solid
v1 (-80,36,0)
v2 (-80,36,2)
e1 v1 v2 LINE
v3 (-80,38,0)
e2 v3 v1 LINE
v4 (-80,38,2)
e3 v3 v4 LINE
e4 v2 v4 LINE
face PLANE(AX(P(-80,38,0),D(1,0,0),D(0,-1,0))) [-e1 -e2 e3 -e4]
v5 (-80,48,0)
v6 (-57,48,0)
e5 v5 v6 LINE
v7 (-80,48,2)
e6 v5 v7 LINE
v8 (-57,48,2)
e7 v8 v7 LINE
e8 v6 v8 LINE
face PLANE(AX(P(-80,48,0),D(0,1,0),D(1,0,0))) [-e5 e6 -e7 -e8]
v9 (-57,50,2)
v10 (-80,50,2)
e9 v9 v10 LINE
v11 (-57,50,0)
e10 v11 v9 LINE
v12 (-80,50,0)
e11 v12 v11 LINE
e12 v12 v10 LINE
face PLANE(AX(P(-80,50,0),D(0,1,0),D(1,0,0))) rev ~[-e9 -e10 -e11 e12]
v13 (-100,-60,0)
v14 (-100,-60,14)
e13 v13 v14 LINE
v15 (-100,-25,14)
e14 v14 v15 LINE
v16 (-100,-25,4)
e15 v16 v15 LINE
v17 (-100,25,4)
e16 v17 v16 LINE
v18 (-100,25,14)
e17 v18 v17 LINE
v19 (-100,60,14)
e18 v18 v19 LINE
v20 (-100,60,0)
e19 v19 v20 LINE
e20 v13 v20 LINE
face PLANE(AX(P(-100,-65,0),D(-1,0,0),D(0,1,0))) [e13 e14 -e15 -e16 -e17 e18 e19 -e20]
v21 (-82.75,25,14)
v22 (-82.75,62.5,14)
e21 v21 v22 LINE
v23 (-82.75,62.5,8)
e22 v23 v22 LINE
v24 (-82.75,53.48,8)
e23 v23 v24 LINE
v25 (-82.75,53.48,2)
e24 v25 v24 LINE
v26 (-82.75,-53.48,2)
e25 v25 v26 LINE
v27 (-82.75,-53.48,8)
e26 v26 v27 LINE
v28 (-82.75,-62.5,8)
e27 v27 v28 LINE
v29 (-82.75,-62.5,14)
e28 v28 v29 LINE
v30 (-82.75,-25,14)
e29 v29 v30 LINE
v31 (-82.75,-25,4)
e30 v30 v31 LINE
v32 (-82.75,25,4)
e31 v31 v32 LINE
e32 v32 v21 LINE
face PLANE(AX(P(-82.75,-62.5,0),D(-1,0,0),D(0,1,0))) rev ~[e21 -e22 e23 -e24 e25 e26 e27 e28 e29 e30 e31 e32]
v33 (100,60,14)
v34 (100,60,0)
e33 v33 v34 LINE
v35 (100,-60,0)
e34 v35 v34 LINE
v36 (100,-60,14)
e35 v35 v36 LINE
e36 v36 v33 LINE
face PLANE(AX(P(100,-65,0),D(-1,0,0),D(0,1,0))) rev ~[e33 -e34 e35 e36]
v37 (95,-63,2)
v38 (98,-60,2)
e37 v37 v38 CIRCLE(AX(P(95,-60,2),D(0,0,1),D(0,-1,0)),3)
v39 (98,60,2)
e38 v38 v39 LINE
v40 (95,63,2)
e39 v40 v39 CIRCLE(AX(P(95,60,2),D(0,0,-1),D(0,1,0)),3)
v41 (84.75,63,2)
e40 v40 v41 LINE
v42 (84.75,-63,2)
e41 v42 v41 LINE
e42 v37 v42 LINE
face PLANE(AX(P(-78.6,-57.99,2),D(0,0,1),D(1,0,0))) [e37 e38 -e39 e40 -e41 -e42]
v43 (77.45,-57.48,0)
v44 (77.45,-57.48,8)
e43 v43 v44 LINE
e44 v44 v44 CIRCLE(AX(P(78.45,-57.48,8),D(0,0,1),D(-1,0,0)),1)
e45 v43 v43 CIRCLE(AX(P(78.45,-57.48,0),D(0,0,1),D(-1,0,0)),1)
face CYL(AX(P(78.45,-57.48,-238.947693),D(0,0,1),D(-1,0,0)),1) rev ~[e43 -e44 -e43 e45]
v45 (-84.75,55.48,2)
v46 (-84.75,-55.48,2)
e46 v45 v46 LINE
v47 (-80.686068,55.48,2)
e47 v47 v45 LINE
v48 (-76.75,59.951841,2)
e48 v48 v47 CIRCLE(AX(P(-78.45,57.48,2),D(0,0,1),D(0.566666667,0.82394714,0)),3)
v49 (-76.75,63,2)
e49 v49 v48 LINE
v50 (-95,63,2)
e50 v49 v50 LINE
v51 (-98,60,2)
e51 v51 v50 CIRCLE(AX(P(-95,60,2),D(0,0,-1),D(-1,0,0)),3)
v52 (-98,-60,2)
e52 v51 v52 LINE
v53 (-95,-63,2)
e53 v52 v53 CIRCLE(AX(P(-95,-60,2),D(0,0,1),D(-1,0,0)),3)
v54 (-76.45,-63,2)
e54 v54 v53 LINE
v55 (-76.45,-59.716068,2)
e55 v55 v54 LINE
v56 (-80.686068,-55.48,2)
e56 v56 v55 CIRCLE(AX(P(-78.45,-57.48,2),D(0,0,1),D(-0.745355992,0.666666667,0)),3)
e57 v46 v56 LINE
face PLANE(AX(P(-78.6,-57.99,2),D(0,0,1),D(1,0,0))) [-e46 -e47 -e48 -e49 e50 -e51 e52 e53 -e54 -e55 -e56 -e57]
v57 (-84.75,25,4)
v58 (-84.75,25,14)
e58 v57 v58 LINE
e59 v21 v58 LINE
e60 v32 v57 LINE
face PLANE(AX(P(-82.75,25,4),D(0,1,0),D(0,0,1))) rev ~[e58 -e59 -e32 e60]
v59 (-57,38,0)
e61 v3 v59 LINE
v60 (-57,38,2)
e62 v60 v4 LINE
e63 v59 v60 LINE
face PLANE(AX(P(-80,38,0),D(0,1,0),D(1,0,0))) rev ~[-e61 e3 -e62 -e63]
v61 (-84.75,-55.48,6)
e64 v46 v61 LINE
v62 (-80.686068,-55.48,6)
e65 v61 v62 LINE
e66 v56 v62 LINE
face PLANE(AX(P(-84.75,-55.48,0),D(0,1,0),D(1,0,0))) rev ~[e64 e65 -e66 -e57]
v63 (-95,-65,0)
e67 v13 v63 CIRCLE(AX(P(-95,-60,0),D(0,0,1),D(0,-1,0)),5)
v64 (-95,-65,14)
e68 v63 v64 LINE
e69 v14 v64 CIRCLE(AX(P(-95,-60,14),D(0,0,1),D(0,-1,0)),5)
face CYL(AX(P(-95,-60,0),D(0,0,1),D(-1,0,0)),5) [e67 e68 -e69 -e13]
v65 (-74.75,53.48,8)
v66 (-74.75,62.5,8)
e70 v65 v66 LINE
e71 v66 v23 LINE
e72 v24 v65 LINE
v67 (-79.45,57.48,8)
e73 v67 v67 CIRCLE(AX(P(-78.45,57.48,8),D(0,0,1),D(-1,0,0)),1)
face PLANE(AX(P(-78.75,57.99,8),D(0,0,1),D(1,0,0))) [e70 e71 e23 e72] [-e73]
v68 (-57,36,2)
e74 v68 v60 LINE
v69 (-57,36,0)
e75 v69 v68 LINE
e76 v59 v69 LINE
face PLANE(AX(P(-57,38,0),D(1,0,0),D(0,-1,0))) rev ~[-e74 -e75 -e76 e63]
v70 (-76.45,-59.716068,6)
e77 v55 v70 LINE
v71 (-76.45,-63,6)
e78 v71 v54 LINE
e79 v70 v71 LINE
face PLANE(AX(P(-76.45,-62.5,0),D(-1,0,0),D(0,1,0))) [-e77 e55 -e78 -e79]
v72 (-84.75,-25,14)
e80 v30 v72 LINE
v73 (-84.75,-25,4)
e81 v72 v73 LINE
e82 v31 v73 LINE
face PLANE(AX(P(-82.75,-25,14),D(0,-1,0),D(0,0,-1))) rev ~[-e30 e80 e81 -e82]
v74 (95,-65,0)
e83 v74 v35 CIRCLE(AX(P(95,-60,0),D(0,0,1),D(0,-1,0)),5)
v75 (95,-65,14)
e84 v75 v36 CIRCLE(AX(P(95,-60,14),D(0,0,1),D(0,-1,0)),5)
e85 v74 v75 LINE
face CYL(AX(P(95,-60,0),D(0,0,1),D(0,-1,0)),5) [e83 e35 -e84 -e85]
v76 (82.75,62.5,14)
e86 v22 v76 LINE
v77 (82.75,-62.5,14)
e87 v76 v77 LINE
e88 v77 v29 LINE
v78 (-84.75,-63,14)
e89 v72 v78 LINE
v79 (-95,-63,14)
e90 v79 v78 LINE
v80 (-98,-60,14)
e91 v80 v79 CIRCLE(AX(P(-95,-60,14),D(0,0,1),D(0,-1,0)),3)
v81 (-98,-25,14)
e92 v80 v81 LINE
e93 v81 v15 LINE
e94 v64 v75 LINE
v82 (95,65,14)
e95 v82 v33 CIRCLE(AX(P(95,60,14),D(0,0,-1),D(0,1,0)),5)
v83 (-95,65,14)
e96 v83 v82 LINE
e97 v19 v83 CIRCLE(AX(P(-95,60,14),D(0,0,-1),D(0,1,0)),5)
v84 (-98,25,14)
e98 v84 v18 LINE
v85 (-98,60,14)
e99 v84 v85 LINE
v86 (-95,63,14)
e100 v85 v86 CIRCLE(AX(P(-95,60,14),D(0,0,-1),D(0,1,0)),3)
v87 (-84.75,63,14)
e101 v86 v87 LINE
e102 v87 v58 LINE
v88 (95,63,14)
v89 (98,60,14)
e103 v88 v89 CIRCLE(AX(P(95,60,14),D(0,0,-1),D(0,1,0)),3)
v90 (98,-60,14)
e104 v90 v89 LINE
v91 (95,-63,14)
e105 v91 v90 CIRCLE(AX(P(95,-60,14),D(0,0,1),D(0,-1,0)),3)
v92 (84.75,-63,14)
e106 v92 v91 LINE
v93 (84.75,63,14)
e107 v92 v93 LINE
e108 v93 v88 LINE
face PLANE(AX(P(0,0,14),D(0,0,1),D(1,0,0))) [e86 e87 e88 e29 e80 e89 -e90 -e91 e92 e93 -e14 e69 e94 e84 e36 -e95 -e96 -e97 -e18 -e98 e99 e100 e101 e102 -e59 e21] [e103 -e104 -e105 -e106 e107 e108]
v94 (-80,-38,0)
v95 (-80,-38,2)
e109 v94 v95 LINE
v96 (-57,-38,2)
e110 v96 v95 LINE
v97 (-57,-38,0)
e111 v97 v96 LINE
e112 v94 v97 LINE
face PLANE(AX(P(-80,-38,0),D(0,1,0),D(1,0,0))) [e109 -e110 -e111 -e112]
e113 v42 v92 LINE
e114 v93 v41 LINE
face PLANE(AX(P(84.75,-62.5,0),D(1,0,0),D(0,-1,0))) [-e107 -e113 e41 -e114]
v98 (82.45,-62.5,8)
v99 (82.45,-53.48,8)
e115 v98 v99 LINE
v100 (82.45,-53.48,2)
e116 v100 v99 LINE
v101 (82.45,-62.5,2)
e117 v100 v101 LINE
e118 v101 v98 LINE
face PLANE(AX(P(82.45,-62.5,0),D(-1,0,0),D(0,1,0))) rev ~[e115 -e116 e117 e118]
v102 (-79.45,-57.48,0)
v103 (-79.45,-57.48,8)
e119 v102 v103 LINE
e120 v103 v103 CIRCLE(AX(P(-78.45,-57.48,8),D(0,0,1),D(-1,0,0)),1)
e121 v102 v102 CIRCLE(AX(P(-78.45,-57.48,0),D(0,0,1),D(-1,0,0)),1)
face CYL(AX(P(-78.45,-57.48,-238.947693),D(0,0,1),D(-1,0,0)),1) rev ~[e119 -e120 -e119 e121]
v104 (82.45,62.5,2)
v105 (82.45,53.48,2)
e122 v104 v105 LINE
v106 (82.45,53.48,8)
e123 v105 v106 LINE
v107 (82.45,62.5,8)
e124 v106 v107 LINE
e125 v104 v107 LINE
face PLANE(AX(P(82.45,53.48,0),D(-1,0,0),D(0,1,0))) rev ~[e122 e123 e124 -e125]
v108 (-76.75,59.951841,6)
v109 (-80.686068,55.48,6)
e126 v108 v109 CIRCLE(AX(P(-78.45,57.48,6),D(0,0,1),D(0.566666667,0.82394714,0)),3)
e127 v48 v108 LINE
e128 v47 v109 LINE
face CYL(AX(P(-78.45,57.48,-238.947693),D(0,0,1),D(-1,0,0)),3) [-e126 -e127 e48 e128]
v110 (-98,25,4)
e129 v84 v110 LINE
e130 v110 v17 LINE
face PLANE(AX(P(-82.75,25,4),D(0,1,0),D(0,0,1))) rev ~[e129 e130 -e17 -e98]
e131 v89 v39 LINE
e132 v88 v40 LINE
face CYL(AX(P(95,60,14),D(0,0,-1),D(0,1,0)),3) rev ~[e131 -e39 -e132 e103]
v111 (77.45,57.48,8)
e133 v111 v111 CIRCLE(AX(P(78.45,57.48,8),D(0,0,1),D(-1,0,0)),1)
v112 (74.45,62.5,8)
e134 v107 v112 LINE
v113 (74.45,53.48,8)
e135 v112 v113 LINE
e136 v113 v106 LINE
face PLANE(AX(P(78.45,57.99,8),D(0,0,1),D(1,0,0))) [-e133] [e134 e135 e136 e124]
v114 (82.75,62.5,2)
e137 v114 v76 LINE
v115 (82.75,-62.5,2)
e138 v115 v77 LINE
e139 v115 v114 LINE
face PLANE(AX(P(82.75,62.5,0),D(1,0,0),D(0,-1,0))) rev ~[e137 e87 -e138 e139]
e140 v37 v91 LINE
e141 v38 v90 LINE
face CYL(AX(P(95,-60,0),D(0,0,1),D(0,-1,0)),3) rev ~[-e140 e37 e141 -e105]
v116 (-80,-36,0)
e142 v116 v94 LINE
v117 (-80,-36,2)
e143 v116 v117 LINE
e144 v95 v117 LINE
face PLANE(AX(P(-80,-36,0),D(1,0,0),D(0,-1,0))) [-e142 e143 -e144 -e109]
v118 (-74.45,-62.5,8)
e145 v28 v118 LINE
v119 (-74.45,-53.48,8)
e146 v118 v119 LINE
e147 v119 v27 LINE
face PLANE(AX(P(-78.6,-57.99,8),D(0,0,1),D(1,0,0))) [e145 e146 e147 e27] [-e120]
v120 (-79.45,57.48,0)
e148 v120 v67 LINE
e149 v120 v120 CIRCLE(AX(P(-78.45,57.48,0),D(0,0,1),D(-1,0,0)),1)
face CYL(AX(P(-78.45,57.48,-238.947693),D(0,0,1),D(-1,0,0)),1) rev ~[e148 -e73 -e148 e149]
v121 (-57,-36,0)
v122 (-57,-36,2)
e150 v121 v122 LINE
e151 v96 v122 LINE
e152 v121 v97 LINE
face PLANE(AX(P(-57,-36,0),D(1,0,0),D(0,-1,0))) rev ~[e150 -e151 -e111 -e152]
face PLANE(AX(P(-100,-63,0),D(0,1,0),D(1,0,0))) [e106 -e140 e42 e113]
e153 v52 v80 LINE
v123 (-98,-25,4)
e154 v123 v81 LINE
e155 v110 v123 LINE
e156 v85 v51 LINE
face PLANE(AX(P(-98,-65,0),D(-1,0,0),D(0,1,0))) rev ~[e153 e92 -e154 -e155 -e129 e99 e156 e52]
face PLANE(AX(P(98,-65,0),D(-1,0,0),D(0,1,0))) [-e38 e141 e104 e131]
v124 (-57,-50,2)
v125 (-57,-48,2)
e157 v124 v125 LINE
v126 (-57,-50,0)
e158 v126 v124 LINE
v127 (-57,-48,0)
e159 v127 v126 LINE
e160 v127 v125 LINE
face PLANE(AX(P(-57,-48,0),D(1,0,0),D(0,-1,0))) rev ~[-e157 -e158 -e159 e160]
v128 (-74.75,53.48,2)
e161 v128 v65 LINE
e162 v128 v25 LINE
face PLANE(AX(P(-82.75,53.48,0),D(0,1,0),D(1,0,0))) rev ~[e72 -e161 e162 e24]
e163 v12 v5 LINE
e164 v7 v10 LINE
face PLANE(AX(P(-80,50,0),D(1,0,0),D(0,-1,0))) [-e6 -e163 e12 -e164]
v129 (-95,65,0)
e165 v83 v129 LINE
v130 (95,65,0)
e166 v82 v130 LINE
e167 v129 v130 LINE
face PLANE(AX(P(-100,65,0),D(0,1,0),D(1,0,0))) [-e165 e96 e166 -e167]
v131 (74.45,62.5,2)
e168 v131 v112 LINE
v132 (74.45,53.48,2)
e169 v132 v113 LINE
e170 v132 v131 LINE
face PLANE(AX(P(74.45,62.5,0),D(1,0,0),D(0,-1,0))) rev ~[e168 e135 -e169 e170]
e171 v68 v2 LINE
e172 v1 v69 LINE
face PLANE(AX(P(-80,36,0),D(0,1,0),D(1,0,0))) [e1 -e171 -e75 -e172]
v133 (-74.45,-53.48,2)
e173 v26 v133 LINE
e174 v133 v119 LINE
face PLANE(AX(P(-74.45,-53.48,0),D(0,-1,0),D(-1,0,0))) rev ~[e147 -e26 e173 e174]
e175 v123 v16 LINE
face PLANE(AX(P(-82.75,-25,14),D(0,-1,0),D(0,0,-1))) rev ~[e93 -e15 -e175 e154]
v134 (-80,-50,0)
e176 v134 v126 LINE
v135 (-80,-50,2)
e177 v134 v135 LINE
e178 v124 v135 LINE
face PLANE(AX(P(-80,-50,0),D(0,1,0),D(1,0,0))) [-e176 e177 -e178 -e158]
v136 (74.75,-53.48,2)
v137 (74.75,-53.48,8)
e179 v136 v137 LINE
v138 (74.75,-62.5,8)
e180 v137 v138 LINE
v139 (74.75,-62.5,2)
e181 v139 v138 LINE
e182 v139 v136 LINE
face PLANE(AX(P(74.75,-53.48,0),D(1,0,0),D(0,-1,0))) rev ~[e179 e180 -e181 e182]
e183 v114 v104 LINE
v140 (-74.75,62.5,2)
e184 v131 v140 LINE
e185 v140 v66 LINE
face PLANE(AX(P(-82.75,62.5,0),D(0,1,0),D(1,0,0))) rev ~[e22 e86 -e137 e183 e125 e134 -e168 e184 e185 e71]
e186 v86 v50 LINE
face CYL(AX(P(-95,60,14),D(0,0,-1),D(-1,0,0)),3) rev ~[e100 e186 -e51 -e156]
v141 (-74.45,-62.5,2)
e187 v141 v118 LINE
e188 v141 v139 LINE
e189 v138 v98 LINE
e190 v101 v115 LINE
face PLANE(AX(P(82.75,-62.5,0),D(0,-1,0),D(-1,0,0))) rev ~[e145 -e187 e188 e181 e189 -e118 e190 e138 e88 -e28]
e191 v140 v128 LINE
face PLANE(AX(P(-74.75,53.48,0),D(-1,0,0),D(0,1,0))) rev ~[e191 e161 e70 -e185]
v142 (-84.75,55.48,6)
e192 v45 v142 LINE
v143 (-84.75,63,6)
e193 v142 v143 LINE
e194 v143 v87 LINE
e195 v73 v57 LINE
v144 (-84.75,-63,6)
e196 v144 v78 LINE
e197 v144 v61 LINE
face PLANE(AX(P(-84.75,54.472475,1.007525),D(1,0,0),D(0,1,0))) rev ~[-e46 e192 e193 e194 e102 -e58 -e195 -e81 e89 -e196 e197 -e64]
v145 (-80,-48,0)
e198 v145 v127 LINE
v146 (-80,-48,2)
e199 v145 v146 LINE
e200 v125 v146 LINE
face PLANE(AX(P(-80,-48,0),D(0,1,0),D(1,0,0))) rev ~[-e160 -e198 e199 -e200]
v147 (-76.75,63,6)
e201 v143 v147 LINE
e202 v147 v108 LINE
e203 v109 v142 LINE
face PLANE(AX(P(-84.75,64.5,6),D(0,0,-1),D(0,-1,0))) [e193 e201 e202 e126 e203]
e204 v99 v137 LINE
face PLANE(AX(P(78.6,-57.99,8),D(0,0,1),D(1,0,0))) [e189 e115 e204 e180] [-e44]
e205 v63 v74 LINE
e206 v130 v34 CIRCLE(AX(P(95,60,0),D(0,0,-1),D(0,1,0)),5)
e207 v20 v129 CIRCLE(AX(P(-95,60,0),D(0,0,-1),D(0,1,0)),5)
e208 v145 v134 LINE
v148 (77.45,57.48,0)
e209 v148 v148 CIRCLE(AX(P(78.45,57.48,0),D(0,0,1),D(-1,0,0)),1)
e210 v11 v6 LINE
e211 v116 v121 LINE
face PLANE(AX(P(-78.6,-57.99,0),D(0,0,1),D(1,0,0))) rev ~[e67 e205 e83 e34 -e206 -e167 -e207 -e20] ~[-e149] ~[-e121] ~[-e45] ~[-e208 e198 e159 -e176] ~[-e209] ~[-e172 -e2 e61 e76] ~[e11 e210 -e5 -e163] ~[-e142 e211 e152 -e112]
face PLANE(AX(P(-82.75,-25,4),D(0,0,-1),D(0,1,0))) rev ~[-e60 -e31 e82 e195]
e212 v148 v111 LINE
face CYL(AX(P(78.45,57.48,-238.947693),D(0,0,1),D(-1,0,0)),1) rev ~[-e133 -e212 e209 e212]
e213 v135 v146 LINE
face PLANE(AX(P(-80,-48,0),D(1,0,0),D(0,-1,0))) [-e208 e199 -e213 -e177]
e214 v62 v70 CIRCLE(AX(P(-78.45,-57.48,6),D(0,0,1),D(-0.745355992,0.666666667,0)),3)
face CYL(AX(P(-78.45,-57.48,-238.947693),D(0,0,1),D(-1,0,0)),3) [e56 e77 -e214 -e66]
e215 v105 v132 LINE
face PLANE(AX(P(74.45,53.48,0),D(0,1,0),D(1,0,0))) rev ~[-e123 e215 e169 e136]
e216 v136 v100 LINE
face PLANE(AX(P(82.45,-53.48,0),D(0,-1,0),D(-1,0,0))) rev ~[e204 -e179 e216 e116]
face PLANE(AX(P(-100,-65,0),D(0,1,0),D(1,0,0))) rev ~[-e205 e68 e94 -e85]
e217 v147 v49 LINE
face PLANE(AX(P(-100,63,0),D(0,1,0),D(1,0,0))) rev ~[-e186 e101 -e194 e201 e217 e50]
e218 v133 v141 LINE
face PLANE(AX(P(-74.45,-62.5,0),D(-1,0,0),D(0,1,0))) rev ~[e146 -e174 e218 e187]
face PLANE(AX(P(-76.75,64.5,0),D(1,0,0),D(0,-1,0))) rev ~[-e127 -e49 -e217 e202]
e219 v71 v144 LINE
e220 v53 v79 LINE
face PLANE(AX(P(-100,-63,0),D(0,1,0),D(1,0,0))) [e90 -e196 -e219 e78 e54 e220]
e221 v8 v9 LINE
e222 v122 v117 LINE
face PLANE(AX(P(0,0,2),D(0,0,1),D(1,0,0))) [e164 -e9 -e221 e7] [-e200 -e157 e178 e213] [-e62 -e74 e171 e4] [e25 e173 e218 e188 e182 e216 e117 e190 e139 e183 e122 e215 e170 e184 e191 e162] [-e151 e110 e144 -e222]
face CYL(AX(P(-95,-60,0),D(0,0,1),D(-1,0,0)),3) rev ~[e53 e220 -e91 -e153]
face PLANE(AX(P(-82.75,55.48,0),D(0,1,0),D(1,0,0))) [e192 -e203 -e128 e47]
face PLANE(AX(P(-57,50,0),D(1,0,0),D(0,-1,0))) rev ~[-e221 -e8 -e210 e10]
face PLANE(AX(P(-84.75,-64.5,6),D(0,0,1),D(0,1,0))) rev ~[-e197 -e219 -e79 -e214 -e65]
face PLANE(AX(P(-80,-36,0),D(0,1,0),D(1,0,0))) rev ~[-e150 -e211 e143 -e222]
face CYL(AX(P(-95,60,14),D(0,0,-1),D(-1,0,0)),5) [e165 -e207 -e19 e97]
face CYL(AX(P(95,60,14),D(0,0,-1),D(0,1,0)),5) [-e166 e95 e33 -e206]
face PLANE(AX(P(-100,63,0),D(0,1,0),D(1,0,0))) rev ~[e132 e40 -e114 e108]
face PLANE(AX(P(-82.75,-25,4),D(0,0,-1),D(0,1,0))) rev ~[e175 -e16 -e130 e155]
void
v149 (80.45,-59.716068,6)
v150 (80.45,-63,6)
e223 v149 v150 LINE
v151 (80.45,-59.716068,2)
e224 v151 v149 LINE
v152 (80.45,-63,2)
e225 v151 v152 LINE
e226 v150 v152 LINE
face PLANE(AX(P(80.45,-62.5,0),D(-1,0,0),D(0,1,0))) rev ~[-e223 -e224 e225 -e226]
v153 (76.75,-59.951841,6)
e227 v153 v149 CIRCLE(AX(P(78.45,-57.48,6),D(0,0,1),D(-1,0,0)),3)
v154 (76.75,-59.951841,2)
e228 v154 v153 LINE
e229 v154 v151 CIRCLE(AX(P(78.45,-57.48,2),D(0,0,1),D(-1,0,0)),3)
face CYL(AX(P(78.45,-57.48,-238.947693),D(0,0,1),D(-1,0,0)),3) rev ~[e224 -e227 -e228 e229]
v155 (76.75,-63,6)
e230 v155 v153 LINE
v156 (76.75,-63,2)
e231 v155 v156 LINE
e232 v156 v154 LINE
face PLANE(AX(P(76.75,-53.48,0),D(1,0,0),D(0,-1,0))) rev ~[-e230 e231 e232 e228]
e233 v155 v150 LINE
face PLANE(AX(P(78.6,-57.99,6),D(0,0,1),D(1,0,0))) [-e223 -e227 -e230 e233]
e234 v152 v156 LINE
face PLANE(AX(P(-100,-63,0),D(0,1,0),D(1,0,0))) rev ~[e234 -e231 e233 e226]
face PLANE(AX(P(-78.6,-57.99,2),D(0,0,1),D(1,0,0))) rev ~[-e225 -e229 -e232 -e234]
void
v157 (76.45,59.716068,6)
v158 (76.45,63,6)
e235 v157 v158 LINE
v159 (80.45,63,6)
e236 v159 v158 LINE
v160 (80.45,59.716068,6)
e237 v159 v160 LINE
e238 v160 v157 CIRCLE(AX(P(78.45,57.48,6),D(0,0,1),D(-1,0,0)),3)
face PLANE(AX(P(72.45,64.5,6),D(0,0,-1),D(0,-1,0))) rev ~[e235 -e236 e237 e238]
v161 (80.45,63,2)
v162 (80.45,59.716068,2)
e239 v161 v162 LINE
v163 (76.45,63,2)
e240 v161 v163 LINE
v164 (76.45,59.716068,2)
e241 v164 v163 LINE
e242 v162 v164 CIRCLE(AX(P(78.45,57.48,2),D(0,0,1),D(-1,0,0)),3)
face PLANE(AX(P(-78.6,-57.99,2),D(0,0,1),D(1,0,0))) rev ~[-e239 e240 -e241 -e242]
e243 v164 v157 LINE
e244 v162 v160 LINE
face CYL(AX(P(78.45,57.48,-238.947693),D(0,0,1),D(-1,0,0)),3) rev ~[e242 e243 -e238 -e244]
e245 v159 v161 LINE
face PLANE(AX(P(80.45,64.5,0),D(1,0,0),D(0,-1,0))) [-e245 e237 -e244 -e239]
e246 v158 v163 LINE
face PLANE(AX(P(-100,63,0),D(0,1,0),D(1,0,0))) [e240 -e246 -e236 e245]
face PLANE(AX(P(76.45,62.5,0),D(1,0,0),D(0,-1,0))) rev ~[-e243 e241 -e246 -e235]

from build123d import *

# Parameters (mm, degrees)
F0_W         = 200
F0_H         = 130
F0_W_2       = 0.3
F0_H_2       = 106.96
F1_DEPTH     = 2
F2_DEPTH     = 14
F3_DEPTH     = 8
F4_D         = 2
F5_R         = 5
F6_T         = 2
F6_T3_DEPTH  = 16
F6_T5_DEPTH  = 10
F6_T7_DEPTH  = 12
F6_T9_DEPTH  = 10
F6_T11_DEPTH = 153.2
F6_T13_DEPTH = 12
F6_T15_DEPTH = 4.3
F6_T17_DEPTH = 129
F6_T19_DEPTH = 12.3
F6_T21_DEPTH = 11.7
F6_T23_DEPTH = 153.2
F6_T25_DEPTH = 13.02
F6_T27_DEPTH = 13.02
F6_T29_DEPTH = 110.96
F7_W         = 23
F7_H         = 2
F8_DEPTH     = 22.5
F9_W         = 50
F9_H         = 8
F9_H_2       = 2
F10_DEPTH    = 25


# Not quite as in the source:
# - a shell that OpenCascade refuses in one call is made with other operations: the cavity is built on its own and cut out


with BuildPart() as f1:
    # F0 (on Top) → F1 (new body)
    with BuildSketch(Plane.XY):
        Rectangle(F0_W, F0_H)
        Polygon((77.15, 62.5), (79.15, 62.5), (82.45, 62.5), (82.75, 62.5), (82.75, 59.5), (82.75, -58.77), (82.75, -62.5), (82.45, -62.5), (79.45, -62.5), (77.45, -62.5), (74.75, -62.5), (-74.45, -62.5), (-77.45, -62.5), (-79.45, -62.5), (-82.75, -62.5), (-82.75, -58.77), (-82.75, -53.48), (-82.75, 53.48), (-82.75, 59.5), (-82.75, 62.5), (-79.75, 62.5), (-77.75, 62.5), (-74.75, 62.5), (74.45, 62.5), align=None, mode=Mode.SUBTRACT)
        Polygon((74.45, 53.48), (74.45, 62.5), (-74.75, 62.5), (-74.75, 53.48), (-82.45, 53.48), (-82.45, -53.48), (-74.45, -53.48), (-74.45, -62.5), (74.75, -62.5), (74.75, -53.48), (82.45, -53.48), (82.45, 53.48), align=None)
        Polygon((-74.75, 53.48), (-74.75, 62.5), (-77.75, 62.5), (-79.75, 62.5), (-82.75, 62.5), (-82.75, 59.5), (-82.75, 53.48), (-82.45, 53.48), align=None)
        Polygon((82.45, 62.5), (79.15, 62.5), (77.15, 62.5), (74.45, 62.5), (74.45, 53.48), (82.45, 53.48), align=None)
        Polygon((82.45, -62.5), (82.45, -53.48), (74.75, -53.48), (74.75, -62.5), (77.45, -62.5), (79.45, -62.5), align=None)
        Polygon((-74.45, -53.48), (-82.45, -53.48), (-82.75, -53.48), (-82.75, -58.77), (-82.75, -62.5), (-79.45, -62.5), (-77.45, -62.5), (-74.45, -62.5), align=None)
        with Locations((-82.6, 0)):
            Rectangle(F0_W_2, F0_H_2)
        Polygon((82.75, 62.5), (82.45, 62.5), (82.45, 53.48), (82.45, -53.48), (82.45, -62.5), (82.75, -62.5), (82.75, -58.77), (82.75, 59.5), align=None)
    extrude(amount=F1_DEPTH)

    # F0 (on Top) → F2 (join)
    with BuildSketch(Plane.XY):
        Rectangle(F0_W, F0_H)
        Polygon((77.15, 62.5), (79.15, 62.5), (82.45, 62.5), (82.75, 62.5), (82.75, 59.5), (82.75, -58.77), (82.75, -62.5), (82.45, -62.5), (79.45, -62.5), (77.45, -62.5), (74.75, -62.5), (-74.45, -62.5), (-77.45, -62.5), (-79.45, -62.5), (-82.75, -62.5), (-82.75, -58.77), (-82.75, -53.48), (-82.75, 53.48), (-82.75, 59.5), (-82.75, 62.5), (-79.75, 62.5), (-77.75, 62.5), (-74.75, 62.5), (74.45, 62.5), align=None, mode=Mode.SUBTRACT)
    extrude(amount=F2_DEPTH)

    # F0 (on Top) → F3 (join)
    with BuildSketch(Plane.XY):
        Polygon((-74.45, -53.48), (-82.45, -53.48), (-82.75, -53.48), (-82.75, -58.77), (-82.75, -62.5), (-79.45, -62.5), (-77.45, -62.5), (-74.45, -62.5), align=None)
        Polygon((-74.75, 53.48), (-74.75, 62.5), (-77.75, 62.5), (-79.75, 62.5), (-82.75, 62.5), (-82.75, 59.5), (-82.75, 53.48), (-82.45, 53.48), align=None)
        Polygon((82.45, -62.5), (82.45, -53.48), (74.75, -53.48), (74.75, -62.5), (77.45, -62.5), (79.45, -62.5), align=None)
        Polygon((82.45, 62.5), (79.15, 62.5), (77.15, 62.5), (74.45, 62.5), (74.45, 53.48), (82.45, 53.48), align=None)
    extrude(amount=F3_DEPTH)

    # F4 (through all)
    with Locations(Plane(origin=(0, 0, 0), x_dir=(1, 0, 0), z_dir=(0, 0, -1))):
        with Locations((-78.45, 57.48), (78.45, 57.48), (-78.45, -57.48), (78.45, -57.48)):
            Hole(F4_D / 2)

    # F5
    f5_edges = [f1.edges().sort_by_distance(p)[0] for p in [
        (-100, -65, 7),
        (-100, 65, 7),
        (100, 65, 7),
        (100, -65, 7),
    ]]
    fillet(f5_edges, radius=F5_R)

    # F6: shell of thickness 2, made by hand


with BuildPart() as f6_core1:
    # F6_t2: copy of F1
    add(f1.part)

    # the walls: a layer under each face that stays
    f6_faces = [f6_core1.faces().sort_by_distance(p)[0] for p in [
        (100, 0, 7),
        (98.5355339059, -63.5355339059, 7),
        (98.5355339059, 63.5355339059, 7),
        (0, 0, 0),
        (0, -65, 7),
        (0, 65, 7),
        (-98.5355339059, -63.5355339059, 7),
        (-98.5355339059, 63.5355339059, 7),
        (-100, 0, 7),
        (0, 62.5, 8),
        (82.75, 0, 8),
        (0, -62.5, 8),
        (-82.75, 0, 8),
        (-79.45, -57.48, 4),
        (77.45, -57.48, 4),
        (-79.45, 57.48, 4),
        (77.45, 57.48, 4),
        (-81.4166666667, 54.9833333333, 8),
        (-74.75, 57.99, 5),
        (0, 0, 2),
        (74.45, 57.99, 5),
        (75.7833333333, 54.9833333333, 8),
        (82.45, 57.99, 5),
        (-74.45, -57.99, 5),
        (-81.3666666667, -60.9966666667, 8),
        (82.45, -57.99, 5),
        (76.0333333333, -60.9966666667, 8),
        (74.75, -57.99, 5),
        (-78.75, 53.48, 5),
        (-78.6, -53.48, 5),
        (78.6, -53.48, 5),
        (78.45, 53.48, 5),
    ]]
    thicken(f6_faces, amount=-F6_T, mode=Mode.SUBTRACT)

    # F6_s4 → F6_t3 (cut)
    with BuildSketch(Plane.XY):
        Polygon((82.73, 62.48), (82.75, 64.5), (84.75, 64.5), (84.75, 62.5), align=None)
        Polygon((82.73, -62.48), (84.75, -62.5), (84.75, -64.5), (82.75, -64.5), align=None)
    extrude(amount=F6_T3_DEPTH, mode=Mode.SUBTRACT)

    # F6_s6 → F6_t5 (cut)
    with BuildSketch(Plane.XY.offset(6)):
        Polygon((-82.73, 62.48), (-82.75, 64.5), (-84.75, 64.5), (-84.75, 62.5), align=None)
        Polygon((-82.73, -62.48), (-82.75, -64.5), (-84.75, -64.5), (-84.75, -62.5), align=None)
    extrude(amount=F6_T5_DEPTH, mode=Mode.SUBTRACT)

    # F6_s8 → F6_t7 (cut)
    with BuildSketch(Plane.YZ.offset(-84.75)):
        Polygon((62.48, 8.02), (64.5, 8), (64.5, 6), (62.5, 6), align=None)
        Polygon((53.46, 2.02), (53.48, 0), (55.48, 0), (55.48, 2), align=None)
    extrude(amount=F6_T7_DEPTH, mode=Mode.SUBTRACT)

    # F6_s10 → F6_t9 (cut)
    with BuildSketch(Plane.XY):
        Polygon((-74.73, 62.48), (-74.75, 64.5), (-76.75, 64.5), (-76.75, 62.5), align=None)
        Polygon((74.43, 62.48), (74.45, 64.5), (76.45, 64.5), (76.45, 62.5), align=None)
        Polygon((82.47, 62.48), (82.45, 64.5), (80.45, 64.5), (80.45, 62.5), align=None)
        Polygon((-74.43, -62.48), (-74.45, -64.5), (-76.45, -64.5), (-76.45, -62.5), align=None)
        Polygon((82.47, -62.48), (82.45, -64.5), (80.45, -64.5), (80.45, -62.5), align=None)
        Polygon((74.73, -62.48), (74.75, -64.5), (76.75, -64.5), (76.75, -62.5), align=None)
        Polygon((-82.73, 53.46), (-84.75, 53.48), (-84.75, 55.48), (-82.75, 55.48), align=None)
        Polygon((-82.73, -53.46), (-84.75, -53.48), (-84.75, -55.48), (-82.75, -55.48), align=None)
    extrude(amount=F6_T9_DEPTH, mode=Mode.SUBTRACT)

    # F6_s12 → F6_t11 (cut)
    with BuildSketch(Plane.YZ.offset(-76.75)):
        Polygon((62.48, 2.02), (64.5, 2), (64.5, 0), (62.5, 0), align=None)
    extrude(amount=F6_T11_DEPTH, mode=Mode.SUBTRACT)

    # F6_s14 → F6_t13 (cut)
    with BuildSketch(Plane.YZ.offset(72.45)):
        Polygon((62.48, 8.02), (64.5, 8), (64.5, 6), (62.5, 6), align=None)
        Polygon((53.46, 2.02), (53.48, 0), (55.48, 0), (55.48, 2), align=None)
    extrude(amount=F6_T13_DEPTH, mode=Mode.SUBTRACT)

    # F6_s16 → F6_t15 (cut)
    with BuildSketch(Plane.YZ.offset(80.45)):
        Polygon((62.48, 2.02), (64.5, 2), (64.5, 0), (62.5, 0), align=None)
        Polygon((-62.48, 2.02), (-64.5, 2), (-64.5, 0), (-62.5, 0), align=None)
    extrude(amount=F6_T15_DEPTH, mode=Mode.SUBTRACT)

    # F6_s18 → F6_t17 (cut)
    with BuildSketch(Plane.XZ.offset(-64.5)):
        Polygon((82.73, 2.02), (84.75, 2), (84.75, 0), (82.75, 0), align=None)
    extrude(amount=F6_T17_DEPTH, mode=Mode.SUBTRACT)

    # F6_s20 → F6_t19 (cut)
    with BuildSketch(Plane.YZ.offset(-84.75)):
        Polygon((-62.48, 8.02), (-64.5, 8), (-64.5, 6), (-62.5, 6), align=None)
        Polygon((-53.46, 2.02), (-53.48, 0), (-55.48, 0), (-55.48, 2), align=None)
    extrude(amount=F6_T19_DEPTH, mode=Mode.SUBTRACT)

    # F6_s22 → F6_t21 (cut)
    with BuildSketch(Plane.YZ.offset(72.75)):
        Polygon((-62.48, 8.02), (-64.5, 8), (-64.5, 6), (-62.5, 6), align=None)
        Polygon((-53.46, 2.02), (-53.48, 0), (-55.48, 0), (-55.48, 2), align=None)
    extrude(amount=F6_T21_DEPTH, mode=Mode.SUBTRACT)

    # F6_s24 → F6_t23 (cut)
    with BuildSketch(Plane.YZ.offset(-76.45)):
        Polygon((-62.48, 2.02), (-64.5, 2), (-64.5, 0), (-62.5, 0), align=None)
    extrude(amount=F6_T23_DEPTH, mode=Mode.SUBTRACT)

    # F6_s26 → F6_t25 (cut)
    with BuildSketch(Plane.XZ.offset(-64.5)):
        Polygon((-82.73, 8.02), (-84.75, 8), (-84.75, 6), (-82.75, 6), align=None)
        Polygon((-74.73, 2.02), (-76.75, 2), (-76.75, 0), (-74.75, 0), align=None)
        Polygon((74.43, 2.02), (74.45, 0), (76.45, 0), (76.45, 2), align=None)
        Polygon((82.47, 2.02), (82.45, 0), (80.45, 0), (80.45, 2), align=None)
    extrude(amount=F6_T25_DEPTH, mode=Mode.SUBTRACT)

    # F6_s28 → F6_t27 (cut)
    with BuildSketch(Plane.XZ.offset(51.48)):
        Polygon((-82.73, 8.02), (-84.75, 8), (-84.75, 6), (-82.75, 6), align=None)
        Polygon((82.47, 2.02), (82.45, 0), (80.45, 0), (80.45, 2), align=None)
        Polygon((74.73, 2.02), (74.75, 0), (76.75, 0), (76.75, 2), align=None)
        Polygon((-74.43, 2.02), (-74.45, 0), (-76.45, 0), (-76.45, 2), align=None)
    extrude(amount=F6_T27_DEPTH, mode=Mode.SUBTRACT)

    # F6_s30 → F6_t29 (cut)
    with BuildSketch(Plane.XZ.offset(-55.48)):
        Polygon((-82.73, 2.02), (-84.75, 2), (-84.75, 0), (-82.75, 0), align=None)
    extrude(amount=F6_T29_DEPTH, mode=Mode.SUBTRACT)


with BuildPart() as f1_1:
    add(f1.part)

    # what is left inside the walls is the cavity
    f6_cavity = [f6_core1.part.solids().sort_by_distance(p)[0] for p in [
        (91.375, -21, 13.98),
        (-87.225, -21, 2.02),
        (78.642053, -60.493887, 4.666667),
        (78.45, 60.5, 4.666667),
    ]]
    add(f6_cavity, mode=Mode.SUBTRACT)

    # F7 (on face) → F8 (cut)
    with BuildSketch(Plane(origin=(0, 0, 0), x_dir=(1, 0, 0), z_dir=(0, 0, -1))):
        with Locations((-68.5, 49)):
            Rectangle(F7_W, F7_H)
        with Locations((-68.5, 37)):
            Rectangle(F7_W, F7_H)
        with Locations((-68.5, -37)):
            Rectangle(F7_W, F7_H)
        with Locations((-68.5, -49)):
            Rectangle(F7_W, F7_H)
    extrude(amount=-F8_DEPTH, mode=Mode.SUBTRACT)

    # F9 (on face) → F10 (cut)
    with BuildSketch(Plane.YZ.offset(-82.75)):
        with Locations((0, 8)):
            Rectangle(F9_W, F9_H)
        with Locations((0, 13)):
            Rectangle(F9_W, F9_H_2)
    extrude(amount=-F10_DEPTH, mode=Mode.SUBTRACT)


solid = f1_1.part
